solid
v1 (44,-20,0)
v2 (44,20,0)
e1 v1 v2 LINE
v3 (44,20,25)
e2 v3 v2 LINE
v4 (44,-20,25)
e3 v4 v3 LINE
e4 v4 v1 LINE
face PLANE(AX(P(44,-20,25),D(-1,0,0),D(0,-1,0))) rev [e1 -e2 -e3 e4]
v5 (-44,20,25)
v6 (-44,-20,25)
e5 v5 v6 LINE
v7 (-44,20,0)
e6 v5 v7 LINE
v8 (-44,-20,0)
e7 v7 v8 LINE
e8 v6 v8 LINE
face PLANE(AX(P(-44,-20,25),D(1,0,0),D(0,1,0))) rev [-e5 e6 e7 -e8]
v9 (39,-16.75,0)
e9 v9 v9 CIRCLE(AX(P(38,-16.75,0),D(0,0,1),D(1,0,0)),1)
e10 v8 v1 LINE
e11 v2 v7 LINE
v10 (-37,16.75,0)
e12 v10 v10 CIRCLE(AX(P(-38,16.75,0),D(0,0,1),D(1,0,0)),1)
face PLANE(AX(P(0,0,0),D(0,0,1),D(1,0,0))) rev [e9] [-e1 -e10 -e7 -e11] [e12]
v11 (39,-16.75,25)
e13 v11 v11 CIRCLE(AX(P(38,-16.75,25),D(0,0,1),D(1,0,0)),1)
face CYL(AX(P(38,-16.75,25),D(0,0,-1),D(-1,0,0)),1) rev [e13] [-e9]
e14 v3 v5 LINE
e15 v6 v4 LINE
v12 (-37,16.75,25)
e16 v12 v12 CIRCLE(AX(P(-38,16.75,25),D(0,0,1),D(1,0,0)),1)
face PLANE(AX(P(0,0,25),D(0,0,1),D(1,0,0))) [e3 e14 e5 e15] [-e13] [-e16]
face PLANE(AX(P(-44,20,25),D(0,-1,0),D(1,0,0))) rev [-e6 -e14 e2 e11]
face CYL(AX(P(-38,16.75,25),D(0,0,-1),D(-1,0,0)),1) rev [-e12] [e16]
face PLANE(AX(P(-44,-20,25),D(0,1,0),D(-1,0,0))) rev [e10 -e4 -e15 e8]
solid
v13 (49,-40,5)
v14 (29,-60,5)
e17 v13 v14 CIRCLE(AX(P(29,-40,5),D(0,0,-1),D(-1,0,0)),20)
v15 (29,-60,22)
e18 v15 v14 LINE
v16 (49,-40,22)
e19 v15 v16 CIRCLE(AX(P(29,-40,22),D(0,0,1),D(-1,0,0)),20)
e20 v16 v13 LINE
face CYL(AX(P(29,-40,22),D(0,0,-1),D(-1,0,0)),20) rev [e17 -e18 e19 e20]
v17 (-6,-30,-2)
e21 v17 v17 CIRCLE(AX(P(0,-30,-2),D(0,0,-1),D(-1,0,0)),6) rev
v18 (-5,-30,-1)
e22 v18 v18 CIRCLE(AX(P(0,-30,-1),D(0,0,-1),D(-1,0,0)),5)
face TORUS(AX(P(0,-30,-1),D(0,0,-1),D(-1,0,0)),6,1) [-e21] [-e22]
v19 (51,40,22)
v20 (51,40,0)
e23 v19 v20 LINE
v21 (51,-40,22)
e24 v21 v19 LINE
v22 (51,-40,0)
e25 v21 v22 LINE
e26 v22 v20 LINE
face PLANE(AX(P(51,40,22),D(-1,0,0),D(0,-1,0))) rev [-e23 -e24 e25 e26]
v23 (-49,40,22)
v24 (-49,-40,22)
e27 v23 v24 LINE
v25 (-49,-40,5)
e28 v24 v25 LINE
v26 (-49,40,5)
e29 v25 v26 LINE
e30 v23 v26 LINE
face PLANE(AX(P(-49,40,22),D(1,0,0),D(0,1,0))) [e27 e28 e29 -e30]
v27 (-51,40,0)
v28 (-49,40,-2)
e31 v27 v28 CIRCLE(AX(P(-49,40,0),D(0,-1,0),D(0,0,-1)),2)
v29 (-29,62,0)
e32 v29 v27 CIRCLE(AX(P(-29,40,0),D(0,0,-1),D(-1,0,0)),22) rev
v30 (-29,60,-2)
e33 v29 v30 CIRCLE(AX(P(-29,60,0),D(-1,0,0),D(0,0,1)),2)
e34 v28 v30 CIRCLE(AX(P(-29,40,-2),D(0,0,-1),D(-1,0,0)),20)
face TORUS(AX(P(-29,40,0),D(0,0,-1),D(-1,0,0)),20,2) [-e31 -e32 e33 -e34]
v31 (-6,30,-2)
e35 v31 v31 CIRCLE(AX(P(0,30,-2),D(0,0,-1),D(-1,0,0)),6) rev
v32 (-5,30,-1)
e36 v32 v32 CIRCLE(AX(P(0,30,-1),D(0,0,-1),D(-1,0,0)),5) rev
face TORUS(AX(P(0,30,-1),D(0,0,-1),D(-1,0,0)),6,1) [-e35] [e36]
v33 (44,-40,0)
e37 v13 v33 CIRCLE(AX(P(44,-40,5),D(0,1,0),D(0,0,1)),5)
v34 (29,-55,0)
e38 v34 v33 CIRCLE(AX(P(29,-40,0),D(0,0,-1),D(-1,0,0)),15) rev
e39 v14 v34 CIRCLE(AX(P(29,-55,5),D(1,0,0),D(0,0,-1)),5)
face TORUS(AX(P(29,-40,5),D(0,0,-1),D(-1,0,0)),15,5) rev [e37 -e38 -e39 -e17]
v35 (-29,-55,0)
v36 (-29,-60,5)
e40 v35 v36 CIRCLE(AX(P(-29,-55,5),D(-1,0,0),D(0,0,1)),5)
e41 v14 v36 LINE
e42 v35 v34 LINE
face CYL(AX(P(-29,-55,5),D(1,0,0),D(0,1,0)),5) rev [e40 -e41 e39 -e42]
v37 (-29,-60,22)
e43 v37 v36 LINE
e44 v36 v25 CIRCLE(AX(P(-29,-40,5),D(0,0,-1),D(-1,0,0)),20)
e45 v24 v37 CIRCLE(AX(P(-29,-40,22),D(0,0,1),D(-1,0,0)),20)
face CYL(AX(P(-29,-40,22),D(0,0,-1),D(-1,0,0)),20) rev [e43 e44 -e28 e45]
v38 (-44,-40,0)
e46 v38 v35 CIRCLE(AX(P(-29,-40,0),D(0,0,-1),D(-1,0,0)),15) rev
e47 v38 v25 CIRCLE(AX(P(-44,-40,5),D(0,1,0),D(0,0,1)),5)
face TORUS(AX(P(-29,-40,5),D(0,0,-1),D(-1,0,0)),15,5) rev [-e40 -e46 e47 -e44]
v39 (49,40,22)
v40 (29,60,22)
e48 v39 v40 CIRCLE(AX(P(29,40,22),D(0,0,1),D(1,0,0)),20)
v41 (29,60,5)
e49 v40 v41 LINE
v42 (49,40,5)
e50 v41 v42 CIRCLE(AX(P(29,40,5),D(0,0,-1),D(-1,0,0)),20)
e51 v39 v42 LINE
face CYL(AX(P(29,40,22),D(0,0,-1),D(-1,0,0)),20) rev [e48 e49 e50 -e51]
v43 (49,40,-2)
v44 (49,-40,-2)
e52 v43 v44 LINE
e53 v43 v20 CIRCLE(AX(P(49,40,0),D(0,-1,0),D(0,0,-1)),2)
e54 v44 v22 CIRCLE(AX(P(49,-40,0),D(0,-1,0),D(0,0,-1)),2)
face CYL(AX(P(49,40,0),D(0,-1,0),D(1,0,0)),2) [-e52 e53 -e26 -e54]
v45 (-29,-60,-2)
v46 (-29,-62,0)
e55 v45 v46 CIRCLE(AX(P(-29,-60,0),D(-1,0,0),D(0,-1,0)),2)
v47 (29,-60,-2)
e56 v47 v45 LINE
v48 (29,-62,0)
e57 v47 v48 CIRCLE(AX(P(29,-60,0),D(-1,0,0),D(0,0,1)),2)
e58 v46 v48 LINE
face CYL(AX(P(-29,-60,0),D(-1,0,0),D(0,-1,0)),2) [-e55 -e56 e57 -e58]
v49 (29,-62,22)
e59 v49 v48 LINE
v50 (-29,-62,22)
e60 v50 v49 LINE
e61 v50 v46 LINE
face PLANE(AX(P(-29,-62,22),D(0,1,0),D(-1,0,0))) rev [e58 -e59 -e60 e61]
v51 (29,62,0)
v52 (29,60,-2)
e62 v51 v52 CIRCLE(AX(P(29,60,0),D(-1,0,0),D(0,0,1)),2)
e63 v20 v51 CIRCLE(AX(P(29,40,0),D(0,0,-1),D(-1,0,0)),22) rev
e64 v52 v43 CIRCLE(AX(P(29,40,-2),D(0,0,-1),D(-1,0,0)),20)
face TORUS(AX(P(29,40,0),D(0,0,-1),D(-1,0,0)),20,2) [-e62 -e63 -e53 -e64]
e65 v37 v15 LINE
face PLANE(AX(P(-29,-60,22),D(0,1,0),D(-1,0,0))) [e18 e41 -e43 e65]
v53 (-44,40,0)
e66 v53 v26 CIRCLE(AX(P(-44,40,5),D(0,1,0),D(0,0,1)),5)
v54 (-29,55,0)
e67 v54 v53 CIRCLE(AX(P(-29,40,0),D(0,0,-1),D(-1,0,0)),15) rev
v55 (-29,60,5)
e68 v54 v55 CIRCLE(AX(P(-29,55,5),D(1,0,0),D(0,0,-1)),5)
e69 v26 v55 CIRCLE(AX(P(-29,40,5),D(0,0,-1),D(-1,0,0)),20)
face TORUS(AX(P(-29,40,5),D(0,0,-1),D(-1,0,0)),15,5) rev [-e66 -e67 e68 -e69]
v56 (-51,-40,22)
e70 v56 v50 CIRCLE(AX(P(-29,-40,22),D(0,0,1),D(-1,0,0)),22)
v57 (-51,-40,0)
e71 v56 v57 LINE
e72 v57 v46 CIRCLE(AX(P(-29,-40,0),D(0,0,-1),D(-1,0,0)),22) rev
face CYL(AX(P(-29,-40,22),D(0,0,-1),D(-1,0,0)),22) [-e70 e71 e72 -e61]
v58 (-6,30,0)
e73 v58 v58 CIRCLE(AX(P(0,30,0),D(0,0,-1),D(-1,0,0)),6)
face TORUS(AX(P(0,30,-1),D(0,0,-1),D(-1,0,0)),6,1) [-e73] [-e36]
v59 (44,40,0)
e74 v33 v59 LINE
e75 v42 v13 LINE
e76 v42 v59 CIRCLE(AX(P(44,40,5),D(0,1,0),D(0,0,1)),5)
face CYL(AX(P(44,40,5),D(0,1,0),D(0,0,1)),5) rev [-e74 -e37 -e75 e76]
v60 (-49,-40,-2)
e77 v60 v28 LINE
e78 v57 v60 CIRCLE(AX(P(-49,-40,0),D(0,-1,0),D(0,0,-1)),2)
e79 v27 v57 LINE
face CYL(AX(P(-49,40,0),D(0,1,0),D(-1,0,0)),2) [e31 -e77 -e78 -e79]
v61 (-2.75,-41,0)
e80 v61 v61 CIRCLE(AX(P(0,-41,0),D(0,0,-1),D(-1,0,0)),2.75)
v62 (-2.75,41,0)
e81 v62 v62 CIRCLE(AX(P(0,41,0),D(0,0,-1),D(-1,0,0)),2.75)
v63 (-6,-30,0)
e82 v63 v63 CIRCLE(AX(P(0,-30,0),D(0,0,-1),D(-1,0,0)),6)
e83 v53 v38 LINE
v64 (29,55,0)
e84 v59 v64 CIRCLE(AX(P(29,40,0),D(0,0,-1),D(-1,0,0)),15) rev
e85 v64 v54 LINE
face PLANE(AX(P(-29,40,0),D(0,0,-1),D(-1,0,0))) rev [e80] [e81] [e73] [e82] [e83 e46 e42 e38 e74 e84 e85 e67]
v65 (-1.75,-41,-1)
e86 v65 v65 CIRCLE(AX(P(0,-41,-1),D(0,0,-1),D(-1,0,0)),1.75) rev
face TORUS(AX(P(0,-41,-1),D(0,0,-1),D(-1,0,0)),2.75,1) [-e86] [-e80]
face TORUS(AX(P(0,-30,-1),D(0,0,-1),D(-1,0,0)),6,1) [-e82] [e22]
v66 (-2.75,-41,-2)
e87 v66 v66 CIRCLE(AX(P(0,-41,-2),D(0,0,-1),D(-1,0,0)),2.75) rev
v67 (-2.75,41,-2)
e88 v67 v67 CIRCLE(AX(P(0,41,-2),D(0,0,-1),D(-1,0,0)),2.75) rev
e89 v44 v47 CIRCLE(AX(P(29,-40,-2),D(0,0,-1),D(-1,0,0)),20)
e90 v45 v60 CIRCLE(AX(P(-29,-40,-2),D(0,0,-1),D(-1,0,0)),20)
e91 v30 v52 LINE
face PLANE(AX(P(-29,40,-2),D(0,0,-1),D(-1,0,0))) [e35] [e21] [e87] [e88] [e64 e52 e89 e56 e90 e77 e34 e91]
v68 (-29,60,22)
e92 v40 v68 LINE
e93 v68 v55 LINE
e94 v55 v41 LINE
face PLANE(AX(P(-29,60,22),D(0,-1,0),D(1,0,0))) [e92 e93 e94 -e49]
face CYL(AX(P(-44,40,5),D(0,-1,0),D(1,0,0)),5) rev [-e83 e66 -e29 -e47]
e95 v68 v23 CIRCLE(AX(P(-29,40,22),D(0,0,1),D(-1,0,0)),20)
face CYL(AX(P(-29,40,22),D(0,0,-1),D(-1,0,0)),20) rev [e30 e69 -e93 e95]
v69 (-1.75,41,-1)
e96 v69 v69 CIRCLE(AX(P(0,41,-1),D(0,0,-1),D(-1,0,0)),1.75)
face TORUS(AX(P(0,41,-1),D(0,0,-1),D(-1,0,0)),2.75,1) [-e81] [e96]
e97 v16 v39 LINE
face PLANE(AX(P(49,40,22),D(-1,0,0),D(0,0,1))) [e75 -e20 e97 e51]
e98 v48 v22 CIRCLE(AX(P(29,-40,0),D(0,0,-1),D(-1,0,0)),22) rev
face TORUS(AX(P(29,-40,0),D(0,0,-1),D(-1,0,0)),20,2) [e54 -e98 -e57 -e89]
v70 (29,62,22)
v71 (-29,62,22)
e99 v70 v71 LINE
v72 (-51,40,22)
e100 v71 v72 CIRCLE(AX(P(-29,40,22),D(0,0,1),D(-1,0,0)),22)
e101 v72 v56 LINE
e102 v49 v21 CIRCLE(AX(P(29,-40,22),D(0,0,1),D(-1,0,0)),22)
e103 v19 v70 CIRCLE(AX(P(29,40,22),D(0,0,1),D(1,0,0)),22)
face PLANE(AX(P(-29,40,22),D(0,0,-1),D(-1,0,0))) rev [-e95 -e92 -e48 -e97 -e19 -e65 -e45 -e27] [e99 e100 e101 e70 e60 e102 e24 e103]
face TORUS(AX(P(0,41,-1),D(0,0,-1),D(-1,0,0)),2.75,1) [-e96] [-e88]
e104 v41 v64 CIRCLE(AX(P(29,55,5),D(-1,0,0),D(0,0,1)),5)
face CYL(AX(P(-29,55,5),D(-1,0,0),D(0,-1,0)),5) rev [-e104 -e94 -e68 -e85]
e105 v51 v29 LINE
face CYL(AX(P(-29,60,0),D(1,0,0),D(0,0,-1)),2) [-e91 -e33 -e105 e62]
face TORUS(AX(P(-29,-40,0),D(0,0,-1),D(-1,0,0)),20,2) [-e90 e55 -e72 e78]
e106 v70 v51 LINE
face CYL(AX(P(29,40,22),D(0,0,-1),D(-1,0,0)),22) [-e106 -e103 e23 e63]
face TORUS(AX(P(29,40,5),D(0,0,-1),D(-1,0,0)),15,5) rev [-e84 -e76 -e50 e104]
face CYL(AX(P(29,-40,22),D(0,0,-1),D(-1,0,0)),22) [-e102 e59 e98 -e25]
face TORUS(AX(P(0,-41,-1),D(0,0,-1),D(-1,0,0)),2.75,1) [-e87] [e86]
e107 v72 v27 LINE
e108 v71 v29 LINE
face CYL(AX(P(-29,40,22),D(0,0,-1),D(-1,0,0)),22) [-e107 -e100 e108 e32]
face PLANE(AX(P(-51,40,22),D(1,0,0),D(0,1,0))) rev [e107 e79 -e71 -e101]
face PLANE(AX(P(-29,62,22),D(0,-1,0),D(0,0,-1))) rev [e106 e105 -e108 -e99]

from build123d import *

# Parameters (mm, degrees)
BOSS_EXTRUDE1_DEPTH = 22
SKETCH3_W           = 88
SKETCH3_H           = 40
SKETCH3_R           = 1
BOSS_EXTRUDE2_DEPTH = 25
SKETCH6_R           = 1.75
SKETCH6_R_2         = 5
BOSS_EXTRUDE3_DEPTH = 2
FILLET10_R          = 5
FILLET12_R          = 2
FILLET13_R          = 1
FILLET14_R          = 1


with BuildPart() as part:
    # Sketch1 → Boss-Extrude1 (new body)
    with BuildSketch(Plane.XY):
        with BuildLine():
            Line((-29, 62), (29, 62))
            ThreePointArc((29, 62), (44.556349186, 55.556349186), (51, 40))
            Line((51, 40), (51, -40))
            ThreePointArc((51, -40), (44.556349186, -55.556349186), (29, -62))
            Line((29, -62), (-29, -62))
            ThreePointArc((-29, -62), (-44.556349186, -55.556349186), (-51, -40))
            Line((-51, -40), (-51, 40))
            ThreePointArc((-51, 40), (-44.556349186, 55.556349186), (-29, 62))
        make_face()
        with BuildLine():
            Line((-29, 60), (29, 60))
            ThreePointArc((29, 60), (43.142135624, 54.142135624), (49, 40))
            Line((49, 40), (49, -40))
            ThreePointArc((49, -40), (43.142135624, -54.142135624), (29, -60))
            Line((29, -60), (-29, -60))
            ThreePointArc((-29, -60), (-43.142135624, -54.142135624), (-49, -40))
            Line((-49, -40), (-49, 40))
            ThreePointArc((-49, 40), (-43.142135624, 54.142135624), (-29, 60))
        make_face(mode=Mode.SUBTRACT)
    extrude(amount=BOSS_EXTRUDE1_DEPTH)


with BuildPart() as body_2:
    # Sketch3 → Boss-Extrude2 (new body)
    with BuildSketch(Plane.XY):
        Rectangle(SKETCH3_W, SKETCH3_H)
        with Locations((-38, 16.75)):
            Circle(SKETCH3_R, mode=Mode.SUBTRACT)
        with Locations((38, -16.75)):
            Circle(SKETCH3_R, mode=Mode.SUBTRACT)
    extrude(amount=BOSS_EXTRUDE2_DEPTH)


with BuildPart() as body_3:
    # Sketch6 → Boss-Extrude3 (new body)
    with BuildSketch(Plane.XY):
        with BuildLine():
            Line((-29, 62), (29, 62))
            ThreePointArc((29, 62), (44.556349186, 55.556349186), (51, 40))
            Line((51, 40), (51, -40))
            ThreePointArc((51, -40), (44.556349186, -55.556349186), (29, -62))
            Line((29, -62), (-29, -62))
            ThreePointArc((-29, -62), (-44.556349186, -55.556349186), (-51, -40))
            Line((-51, -40), (-51, 40))
            ThreePointArc((-51, 40), (-44.556349186, 55.556349186), (-29, 62))
        make_face()
        with Locations((0, 41)):
            Circle(SKETCH6_R, mode=Mode.SUBTRACT)
        with Locations((0, -41)):
            Circle(SKETCH6_R, mode=Mode.SUBTRACT)
        with Locations((0, 30)):
            Circle(SKETCH6_R_2, mode=Mode.SUBTRACT)
        with Locations((0, -30)):
            Circle(SKETCH6_R_2, mode=Mode.SUBTRACT)
    extrude(amount=-BOSS_EXTRUDE3_DEPTH)


with BuildPart() as part_1:
    add(part.part)

    # Combine1: union body 3
    add(body_3.part)

    # Fillet10
    fillet10_edges = [part_1.edges().sort_by_distance(p)[0] for p in [
        (43.142135624, 54.142135624, 0),
        (0, 60, 0),
        (-43.142135624, 54.142135624, 0),
        (-49, 0, 0),
        (-43.142135624, -54.142135624, 0),
        (0, -60, 0),
        (43.142135624, -54.142135624, 0),
        (49, 0, 0),
    ]]
    fillet(fillet10_edges, radius=FILLET10_R)

    # Fillet12
    fillet12_edges = [part_1.edges().sort_by_distance(p)[0] for p in [
        (-44.556349186, 55.556349186, -2),
        (0, 62, -2),
        (44.556349186, 55.556349186, -2),
        (51, 0, -2),
        (44.556349186, -55.556349186, -2),
        (0, -62, -2),
        (-44.556349186, -55.556349186, -2),
        (-51, 0, -2),
    ]]
    fillet(fillet12_edges, radius=FILLET12_R)

    # Fillet13
    fillet13_edges = [part_1.edges().sort_by_distance(p)[0] for p in [
        (-5, 30, -2),
        (-5, 30, 0),
    ]]
    fillet(fillet13_edges, radius=FILLET13_R - 0.0001)  # a hair under: the kernel refuses the full size

    # Fillet14
    fillet14_edges = [part_1.edges().sort_by_distance(p)[0] for p in [
        (-5, -30, -2),
        (-1.75, -41, -2),
        (-1.75, 41, -2),
        (-1.75, 41, 0),
        (-1.75, -41, 0),
        (-5, -30, 0),
    ]]
    fillet(fillet14_edges, radius=FILLET14_R - 0.0001)  # a hair under: the kernel refuses the full size


solid = Compound([body_2.part, part_1.part])
